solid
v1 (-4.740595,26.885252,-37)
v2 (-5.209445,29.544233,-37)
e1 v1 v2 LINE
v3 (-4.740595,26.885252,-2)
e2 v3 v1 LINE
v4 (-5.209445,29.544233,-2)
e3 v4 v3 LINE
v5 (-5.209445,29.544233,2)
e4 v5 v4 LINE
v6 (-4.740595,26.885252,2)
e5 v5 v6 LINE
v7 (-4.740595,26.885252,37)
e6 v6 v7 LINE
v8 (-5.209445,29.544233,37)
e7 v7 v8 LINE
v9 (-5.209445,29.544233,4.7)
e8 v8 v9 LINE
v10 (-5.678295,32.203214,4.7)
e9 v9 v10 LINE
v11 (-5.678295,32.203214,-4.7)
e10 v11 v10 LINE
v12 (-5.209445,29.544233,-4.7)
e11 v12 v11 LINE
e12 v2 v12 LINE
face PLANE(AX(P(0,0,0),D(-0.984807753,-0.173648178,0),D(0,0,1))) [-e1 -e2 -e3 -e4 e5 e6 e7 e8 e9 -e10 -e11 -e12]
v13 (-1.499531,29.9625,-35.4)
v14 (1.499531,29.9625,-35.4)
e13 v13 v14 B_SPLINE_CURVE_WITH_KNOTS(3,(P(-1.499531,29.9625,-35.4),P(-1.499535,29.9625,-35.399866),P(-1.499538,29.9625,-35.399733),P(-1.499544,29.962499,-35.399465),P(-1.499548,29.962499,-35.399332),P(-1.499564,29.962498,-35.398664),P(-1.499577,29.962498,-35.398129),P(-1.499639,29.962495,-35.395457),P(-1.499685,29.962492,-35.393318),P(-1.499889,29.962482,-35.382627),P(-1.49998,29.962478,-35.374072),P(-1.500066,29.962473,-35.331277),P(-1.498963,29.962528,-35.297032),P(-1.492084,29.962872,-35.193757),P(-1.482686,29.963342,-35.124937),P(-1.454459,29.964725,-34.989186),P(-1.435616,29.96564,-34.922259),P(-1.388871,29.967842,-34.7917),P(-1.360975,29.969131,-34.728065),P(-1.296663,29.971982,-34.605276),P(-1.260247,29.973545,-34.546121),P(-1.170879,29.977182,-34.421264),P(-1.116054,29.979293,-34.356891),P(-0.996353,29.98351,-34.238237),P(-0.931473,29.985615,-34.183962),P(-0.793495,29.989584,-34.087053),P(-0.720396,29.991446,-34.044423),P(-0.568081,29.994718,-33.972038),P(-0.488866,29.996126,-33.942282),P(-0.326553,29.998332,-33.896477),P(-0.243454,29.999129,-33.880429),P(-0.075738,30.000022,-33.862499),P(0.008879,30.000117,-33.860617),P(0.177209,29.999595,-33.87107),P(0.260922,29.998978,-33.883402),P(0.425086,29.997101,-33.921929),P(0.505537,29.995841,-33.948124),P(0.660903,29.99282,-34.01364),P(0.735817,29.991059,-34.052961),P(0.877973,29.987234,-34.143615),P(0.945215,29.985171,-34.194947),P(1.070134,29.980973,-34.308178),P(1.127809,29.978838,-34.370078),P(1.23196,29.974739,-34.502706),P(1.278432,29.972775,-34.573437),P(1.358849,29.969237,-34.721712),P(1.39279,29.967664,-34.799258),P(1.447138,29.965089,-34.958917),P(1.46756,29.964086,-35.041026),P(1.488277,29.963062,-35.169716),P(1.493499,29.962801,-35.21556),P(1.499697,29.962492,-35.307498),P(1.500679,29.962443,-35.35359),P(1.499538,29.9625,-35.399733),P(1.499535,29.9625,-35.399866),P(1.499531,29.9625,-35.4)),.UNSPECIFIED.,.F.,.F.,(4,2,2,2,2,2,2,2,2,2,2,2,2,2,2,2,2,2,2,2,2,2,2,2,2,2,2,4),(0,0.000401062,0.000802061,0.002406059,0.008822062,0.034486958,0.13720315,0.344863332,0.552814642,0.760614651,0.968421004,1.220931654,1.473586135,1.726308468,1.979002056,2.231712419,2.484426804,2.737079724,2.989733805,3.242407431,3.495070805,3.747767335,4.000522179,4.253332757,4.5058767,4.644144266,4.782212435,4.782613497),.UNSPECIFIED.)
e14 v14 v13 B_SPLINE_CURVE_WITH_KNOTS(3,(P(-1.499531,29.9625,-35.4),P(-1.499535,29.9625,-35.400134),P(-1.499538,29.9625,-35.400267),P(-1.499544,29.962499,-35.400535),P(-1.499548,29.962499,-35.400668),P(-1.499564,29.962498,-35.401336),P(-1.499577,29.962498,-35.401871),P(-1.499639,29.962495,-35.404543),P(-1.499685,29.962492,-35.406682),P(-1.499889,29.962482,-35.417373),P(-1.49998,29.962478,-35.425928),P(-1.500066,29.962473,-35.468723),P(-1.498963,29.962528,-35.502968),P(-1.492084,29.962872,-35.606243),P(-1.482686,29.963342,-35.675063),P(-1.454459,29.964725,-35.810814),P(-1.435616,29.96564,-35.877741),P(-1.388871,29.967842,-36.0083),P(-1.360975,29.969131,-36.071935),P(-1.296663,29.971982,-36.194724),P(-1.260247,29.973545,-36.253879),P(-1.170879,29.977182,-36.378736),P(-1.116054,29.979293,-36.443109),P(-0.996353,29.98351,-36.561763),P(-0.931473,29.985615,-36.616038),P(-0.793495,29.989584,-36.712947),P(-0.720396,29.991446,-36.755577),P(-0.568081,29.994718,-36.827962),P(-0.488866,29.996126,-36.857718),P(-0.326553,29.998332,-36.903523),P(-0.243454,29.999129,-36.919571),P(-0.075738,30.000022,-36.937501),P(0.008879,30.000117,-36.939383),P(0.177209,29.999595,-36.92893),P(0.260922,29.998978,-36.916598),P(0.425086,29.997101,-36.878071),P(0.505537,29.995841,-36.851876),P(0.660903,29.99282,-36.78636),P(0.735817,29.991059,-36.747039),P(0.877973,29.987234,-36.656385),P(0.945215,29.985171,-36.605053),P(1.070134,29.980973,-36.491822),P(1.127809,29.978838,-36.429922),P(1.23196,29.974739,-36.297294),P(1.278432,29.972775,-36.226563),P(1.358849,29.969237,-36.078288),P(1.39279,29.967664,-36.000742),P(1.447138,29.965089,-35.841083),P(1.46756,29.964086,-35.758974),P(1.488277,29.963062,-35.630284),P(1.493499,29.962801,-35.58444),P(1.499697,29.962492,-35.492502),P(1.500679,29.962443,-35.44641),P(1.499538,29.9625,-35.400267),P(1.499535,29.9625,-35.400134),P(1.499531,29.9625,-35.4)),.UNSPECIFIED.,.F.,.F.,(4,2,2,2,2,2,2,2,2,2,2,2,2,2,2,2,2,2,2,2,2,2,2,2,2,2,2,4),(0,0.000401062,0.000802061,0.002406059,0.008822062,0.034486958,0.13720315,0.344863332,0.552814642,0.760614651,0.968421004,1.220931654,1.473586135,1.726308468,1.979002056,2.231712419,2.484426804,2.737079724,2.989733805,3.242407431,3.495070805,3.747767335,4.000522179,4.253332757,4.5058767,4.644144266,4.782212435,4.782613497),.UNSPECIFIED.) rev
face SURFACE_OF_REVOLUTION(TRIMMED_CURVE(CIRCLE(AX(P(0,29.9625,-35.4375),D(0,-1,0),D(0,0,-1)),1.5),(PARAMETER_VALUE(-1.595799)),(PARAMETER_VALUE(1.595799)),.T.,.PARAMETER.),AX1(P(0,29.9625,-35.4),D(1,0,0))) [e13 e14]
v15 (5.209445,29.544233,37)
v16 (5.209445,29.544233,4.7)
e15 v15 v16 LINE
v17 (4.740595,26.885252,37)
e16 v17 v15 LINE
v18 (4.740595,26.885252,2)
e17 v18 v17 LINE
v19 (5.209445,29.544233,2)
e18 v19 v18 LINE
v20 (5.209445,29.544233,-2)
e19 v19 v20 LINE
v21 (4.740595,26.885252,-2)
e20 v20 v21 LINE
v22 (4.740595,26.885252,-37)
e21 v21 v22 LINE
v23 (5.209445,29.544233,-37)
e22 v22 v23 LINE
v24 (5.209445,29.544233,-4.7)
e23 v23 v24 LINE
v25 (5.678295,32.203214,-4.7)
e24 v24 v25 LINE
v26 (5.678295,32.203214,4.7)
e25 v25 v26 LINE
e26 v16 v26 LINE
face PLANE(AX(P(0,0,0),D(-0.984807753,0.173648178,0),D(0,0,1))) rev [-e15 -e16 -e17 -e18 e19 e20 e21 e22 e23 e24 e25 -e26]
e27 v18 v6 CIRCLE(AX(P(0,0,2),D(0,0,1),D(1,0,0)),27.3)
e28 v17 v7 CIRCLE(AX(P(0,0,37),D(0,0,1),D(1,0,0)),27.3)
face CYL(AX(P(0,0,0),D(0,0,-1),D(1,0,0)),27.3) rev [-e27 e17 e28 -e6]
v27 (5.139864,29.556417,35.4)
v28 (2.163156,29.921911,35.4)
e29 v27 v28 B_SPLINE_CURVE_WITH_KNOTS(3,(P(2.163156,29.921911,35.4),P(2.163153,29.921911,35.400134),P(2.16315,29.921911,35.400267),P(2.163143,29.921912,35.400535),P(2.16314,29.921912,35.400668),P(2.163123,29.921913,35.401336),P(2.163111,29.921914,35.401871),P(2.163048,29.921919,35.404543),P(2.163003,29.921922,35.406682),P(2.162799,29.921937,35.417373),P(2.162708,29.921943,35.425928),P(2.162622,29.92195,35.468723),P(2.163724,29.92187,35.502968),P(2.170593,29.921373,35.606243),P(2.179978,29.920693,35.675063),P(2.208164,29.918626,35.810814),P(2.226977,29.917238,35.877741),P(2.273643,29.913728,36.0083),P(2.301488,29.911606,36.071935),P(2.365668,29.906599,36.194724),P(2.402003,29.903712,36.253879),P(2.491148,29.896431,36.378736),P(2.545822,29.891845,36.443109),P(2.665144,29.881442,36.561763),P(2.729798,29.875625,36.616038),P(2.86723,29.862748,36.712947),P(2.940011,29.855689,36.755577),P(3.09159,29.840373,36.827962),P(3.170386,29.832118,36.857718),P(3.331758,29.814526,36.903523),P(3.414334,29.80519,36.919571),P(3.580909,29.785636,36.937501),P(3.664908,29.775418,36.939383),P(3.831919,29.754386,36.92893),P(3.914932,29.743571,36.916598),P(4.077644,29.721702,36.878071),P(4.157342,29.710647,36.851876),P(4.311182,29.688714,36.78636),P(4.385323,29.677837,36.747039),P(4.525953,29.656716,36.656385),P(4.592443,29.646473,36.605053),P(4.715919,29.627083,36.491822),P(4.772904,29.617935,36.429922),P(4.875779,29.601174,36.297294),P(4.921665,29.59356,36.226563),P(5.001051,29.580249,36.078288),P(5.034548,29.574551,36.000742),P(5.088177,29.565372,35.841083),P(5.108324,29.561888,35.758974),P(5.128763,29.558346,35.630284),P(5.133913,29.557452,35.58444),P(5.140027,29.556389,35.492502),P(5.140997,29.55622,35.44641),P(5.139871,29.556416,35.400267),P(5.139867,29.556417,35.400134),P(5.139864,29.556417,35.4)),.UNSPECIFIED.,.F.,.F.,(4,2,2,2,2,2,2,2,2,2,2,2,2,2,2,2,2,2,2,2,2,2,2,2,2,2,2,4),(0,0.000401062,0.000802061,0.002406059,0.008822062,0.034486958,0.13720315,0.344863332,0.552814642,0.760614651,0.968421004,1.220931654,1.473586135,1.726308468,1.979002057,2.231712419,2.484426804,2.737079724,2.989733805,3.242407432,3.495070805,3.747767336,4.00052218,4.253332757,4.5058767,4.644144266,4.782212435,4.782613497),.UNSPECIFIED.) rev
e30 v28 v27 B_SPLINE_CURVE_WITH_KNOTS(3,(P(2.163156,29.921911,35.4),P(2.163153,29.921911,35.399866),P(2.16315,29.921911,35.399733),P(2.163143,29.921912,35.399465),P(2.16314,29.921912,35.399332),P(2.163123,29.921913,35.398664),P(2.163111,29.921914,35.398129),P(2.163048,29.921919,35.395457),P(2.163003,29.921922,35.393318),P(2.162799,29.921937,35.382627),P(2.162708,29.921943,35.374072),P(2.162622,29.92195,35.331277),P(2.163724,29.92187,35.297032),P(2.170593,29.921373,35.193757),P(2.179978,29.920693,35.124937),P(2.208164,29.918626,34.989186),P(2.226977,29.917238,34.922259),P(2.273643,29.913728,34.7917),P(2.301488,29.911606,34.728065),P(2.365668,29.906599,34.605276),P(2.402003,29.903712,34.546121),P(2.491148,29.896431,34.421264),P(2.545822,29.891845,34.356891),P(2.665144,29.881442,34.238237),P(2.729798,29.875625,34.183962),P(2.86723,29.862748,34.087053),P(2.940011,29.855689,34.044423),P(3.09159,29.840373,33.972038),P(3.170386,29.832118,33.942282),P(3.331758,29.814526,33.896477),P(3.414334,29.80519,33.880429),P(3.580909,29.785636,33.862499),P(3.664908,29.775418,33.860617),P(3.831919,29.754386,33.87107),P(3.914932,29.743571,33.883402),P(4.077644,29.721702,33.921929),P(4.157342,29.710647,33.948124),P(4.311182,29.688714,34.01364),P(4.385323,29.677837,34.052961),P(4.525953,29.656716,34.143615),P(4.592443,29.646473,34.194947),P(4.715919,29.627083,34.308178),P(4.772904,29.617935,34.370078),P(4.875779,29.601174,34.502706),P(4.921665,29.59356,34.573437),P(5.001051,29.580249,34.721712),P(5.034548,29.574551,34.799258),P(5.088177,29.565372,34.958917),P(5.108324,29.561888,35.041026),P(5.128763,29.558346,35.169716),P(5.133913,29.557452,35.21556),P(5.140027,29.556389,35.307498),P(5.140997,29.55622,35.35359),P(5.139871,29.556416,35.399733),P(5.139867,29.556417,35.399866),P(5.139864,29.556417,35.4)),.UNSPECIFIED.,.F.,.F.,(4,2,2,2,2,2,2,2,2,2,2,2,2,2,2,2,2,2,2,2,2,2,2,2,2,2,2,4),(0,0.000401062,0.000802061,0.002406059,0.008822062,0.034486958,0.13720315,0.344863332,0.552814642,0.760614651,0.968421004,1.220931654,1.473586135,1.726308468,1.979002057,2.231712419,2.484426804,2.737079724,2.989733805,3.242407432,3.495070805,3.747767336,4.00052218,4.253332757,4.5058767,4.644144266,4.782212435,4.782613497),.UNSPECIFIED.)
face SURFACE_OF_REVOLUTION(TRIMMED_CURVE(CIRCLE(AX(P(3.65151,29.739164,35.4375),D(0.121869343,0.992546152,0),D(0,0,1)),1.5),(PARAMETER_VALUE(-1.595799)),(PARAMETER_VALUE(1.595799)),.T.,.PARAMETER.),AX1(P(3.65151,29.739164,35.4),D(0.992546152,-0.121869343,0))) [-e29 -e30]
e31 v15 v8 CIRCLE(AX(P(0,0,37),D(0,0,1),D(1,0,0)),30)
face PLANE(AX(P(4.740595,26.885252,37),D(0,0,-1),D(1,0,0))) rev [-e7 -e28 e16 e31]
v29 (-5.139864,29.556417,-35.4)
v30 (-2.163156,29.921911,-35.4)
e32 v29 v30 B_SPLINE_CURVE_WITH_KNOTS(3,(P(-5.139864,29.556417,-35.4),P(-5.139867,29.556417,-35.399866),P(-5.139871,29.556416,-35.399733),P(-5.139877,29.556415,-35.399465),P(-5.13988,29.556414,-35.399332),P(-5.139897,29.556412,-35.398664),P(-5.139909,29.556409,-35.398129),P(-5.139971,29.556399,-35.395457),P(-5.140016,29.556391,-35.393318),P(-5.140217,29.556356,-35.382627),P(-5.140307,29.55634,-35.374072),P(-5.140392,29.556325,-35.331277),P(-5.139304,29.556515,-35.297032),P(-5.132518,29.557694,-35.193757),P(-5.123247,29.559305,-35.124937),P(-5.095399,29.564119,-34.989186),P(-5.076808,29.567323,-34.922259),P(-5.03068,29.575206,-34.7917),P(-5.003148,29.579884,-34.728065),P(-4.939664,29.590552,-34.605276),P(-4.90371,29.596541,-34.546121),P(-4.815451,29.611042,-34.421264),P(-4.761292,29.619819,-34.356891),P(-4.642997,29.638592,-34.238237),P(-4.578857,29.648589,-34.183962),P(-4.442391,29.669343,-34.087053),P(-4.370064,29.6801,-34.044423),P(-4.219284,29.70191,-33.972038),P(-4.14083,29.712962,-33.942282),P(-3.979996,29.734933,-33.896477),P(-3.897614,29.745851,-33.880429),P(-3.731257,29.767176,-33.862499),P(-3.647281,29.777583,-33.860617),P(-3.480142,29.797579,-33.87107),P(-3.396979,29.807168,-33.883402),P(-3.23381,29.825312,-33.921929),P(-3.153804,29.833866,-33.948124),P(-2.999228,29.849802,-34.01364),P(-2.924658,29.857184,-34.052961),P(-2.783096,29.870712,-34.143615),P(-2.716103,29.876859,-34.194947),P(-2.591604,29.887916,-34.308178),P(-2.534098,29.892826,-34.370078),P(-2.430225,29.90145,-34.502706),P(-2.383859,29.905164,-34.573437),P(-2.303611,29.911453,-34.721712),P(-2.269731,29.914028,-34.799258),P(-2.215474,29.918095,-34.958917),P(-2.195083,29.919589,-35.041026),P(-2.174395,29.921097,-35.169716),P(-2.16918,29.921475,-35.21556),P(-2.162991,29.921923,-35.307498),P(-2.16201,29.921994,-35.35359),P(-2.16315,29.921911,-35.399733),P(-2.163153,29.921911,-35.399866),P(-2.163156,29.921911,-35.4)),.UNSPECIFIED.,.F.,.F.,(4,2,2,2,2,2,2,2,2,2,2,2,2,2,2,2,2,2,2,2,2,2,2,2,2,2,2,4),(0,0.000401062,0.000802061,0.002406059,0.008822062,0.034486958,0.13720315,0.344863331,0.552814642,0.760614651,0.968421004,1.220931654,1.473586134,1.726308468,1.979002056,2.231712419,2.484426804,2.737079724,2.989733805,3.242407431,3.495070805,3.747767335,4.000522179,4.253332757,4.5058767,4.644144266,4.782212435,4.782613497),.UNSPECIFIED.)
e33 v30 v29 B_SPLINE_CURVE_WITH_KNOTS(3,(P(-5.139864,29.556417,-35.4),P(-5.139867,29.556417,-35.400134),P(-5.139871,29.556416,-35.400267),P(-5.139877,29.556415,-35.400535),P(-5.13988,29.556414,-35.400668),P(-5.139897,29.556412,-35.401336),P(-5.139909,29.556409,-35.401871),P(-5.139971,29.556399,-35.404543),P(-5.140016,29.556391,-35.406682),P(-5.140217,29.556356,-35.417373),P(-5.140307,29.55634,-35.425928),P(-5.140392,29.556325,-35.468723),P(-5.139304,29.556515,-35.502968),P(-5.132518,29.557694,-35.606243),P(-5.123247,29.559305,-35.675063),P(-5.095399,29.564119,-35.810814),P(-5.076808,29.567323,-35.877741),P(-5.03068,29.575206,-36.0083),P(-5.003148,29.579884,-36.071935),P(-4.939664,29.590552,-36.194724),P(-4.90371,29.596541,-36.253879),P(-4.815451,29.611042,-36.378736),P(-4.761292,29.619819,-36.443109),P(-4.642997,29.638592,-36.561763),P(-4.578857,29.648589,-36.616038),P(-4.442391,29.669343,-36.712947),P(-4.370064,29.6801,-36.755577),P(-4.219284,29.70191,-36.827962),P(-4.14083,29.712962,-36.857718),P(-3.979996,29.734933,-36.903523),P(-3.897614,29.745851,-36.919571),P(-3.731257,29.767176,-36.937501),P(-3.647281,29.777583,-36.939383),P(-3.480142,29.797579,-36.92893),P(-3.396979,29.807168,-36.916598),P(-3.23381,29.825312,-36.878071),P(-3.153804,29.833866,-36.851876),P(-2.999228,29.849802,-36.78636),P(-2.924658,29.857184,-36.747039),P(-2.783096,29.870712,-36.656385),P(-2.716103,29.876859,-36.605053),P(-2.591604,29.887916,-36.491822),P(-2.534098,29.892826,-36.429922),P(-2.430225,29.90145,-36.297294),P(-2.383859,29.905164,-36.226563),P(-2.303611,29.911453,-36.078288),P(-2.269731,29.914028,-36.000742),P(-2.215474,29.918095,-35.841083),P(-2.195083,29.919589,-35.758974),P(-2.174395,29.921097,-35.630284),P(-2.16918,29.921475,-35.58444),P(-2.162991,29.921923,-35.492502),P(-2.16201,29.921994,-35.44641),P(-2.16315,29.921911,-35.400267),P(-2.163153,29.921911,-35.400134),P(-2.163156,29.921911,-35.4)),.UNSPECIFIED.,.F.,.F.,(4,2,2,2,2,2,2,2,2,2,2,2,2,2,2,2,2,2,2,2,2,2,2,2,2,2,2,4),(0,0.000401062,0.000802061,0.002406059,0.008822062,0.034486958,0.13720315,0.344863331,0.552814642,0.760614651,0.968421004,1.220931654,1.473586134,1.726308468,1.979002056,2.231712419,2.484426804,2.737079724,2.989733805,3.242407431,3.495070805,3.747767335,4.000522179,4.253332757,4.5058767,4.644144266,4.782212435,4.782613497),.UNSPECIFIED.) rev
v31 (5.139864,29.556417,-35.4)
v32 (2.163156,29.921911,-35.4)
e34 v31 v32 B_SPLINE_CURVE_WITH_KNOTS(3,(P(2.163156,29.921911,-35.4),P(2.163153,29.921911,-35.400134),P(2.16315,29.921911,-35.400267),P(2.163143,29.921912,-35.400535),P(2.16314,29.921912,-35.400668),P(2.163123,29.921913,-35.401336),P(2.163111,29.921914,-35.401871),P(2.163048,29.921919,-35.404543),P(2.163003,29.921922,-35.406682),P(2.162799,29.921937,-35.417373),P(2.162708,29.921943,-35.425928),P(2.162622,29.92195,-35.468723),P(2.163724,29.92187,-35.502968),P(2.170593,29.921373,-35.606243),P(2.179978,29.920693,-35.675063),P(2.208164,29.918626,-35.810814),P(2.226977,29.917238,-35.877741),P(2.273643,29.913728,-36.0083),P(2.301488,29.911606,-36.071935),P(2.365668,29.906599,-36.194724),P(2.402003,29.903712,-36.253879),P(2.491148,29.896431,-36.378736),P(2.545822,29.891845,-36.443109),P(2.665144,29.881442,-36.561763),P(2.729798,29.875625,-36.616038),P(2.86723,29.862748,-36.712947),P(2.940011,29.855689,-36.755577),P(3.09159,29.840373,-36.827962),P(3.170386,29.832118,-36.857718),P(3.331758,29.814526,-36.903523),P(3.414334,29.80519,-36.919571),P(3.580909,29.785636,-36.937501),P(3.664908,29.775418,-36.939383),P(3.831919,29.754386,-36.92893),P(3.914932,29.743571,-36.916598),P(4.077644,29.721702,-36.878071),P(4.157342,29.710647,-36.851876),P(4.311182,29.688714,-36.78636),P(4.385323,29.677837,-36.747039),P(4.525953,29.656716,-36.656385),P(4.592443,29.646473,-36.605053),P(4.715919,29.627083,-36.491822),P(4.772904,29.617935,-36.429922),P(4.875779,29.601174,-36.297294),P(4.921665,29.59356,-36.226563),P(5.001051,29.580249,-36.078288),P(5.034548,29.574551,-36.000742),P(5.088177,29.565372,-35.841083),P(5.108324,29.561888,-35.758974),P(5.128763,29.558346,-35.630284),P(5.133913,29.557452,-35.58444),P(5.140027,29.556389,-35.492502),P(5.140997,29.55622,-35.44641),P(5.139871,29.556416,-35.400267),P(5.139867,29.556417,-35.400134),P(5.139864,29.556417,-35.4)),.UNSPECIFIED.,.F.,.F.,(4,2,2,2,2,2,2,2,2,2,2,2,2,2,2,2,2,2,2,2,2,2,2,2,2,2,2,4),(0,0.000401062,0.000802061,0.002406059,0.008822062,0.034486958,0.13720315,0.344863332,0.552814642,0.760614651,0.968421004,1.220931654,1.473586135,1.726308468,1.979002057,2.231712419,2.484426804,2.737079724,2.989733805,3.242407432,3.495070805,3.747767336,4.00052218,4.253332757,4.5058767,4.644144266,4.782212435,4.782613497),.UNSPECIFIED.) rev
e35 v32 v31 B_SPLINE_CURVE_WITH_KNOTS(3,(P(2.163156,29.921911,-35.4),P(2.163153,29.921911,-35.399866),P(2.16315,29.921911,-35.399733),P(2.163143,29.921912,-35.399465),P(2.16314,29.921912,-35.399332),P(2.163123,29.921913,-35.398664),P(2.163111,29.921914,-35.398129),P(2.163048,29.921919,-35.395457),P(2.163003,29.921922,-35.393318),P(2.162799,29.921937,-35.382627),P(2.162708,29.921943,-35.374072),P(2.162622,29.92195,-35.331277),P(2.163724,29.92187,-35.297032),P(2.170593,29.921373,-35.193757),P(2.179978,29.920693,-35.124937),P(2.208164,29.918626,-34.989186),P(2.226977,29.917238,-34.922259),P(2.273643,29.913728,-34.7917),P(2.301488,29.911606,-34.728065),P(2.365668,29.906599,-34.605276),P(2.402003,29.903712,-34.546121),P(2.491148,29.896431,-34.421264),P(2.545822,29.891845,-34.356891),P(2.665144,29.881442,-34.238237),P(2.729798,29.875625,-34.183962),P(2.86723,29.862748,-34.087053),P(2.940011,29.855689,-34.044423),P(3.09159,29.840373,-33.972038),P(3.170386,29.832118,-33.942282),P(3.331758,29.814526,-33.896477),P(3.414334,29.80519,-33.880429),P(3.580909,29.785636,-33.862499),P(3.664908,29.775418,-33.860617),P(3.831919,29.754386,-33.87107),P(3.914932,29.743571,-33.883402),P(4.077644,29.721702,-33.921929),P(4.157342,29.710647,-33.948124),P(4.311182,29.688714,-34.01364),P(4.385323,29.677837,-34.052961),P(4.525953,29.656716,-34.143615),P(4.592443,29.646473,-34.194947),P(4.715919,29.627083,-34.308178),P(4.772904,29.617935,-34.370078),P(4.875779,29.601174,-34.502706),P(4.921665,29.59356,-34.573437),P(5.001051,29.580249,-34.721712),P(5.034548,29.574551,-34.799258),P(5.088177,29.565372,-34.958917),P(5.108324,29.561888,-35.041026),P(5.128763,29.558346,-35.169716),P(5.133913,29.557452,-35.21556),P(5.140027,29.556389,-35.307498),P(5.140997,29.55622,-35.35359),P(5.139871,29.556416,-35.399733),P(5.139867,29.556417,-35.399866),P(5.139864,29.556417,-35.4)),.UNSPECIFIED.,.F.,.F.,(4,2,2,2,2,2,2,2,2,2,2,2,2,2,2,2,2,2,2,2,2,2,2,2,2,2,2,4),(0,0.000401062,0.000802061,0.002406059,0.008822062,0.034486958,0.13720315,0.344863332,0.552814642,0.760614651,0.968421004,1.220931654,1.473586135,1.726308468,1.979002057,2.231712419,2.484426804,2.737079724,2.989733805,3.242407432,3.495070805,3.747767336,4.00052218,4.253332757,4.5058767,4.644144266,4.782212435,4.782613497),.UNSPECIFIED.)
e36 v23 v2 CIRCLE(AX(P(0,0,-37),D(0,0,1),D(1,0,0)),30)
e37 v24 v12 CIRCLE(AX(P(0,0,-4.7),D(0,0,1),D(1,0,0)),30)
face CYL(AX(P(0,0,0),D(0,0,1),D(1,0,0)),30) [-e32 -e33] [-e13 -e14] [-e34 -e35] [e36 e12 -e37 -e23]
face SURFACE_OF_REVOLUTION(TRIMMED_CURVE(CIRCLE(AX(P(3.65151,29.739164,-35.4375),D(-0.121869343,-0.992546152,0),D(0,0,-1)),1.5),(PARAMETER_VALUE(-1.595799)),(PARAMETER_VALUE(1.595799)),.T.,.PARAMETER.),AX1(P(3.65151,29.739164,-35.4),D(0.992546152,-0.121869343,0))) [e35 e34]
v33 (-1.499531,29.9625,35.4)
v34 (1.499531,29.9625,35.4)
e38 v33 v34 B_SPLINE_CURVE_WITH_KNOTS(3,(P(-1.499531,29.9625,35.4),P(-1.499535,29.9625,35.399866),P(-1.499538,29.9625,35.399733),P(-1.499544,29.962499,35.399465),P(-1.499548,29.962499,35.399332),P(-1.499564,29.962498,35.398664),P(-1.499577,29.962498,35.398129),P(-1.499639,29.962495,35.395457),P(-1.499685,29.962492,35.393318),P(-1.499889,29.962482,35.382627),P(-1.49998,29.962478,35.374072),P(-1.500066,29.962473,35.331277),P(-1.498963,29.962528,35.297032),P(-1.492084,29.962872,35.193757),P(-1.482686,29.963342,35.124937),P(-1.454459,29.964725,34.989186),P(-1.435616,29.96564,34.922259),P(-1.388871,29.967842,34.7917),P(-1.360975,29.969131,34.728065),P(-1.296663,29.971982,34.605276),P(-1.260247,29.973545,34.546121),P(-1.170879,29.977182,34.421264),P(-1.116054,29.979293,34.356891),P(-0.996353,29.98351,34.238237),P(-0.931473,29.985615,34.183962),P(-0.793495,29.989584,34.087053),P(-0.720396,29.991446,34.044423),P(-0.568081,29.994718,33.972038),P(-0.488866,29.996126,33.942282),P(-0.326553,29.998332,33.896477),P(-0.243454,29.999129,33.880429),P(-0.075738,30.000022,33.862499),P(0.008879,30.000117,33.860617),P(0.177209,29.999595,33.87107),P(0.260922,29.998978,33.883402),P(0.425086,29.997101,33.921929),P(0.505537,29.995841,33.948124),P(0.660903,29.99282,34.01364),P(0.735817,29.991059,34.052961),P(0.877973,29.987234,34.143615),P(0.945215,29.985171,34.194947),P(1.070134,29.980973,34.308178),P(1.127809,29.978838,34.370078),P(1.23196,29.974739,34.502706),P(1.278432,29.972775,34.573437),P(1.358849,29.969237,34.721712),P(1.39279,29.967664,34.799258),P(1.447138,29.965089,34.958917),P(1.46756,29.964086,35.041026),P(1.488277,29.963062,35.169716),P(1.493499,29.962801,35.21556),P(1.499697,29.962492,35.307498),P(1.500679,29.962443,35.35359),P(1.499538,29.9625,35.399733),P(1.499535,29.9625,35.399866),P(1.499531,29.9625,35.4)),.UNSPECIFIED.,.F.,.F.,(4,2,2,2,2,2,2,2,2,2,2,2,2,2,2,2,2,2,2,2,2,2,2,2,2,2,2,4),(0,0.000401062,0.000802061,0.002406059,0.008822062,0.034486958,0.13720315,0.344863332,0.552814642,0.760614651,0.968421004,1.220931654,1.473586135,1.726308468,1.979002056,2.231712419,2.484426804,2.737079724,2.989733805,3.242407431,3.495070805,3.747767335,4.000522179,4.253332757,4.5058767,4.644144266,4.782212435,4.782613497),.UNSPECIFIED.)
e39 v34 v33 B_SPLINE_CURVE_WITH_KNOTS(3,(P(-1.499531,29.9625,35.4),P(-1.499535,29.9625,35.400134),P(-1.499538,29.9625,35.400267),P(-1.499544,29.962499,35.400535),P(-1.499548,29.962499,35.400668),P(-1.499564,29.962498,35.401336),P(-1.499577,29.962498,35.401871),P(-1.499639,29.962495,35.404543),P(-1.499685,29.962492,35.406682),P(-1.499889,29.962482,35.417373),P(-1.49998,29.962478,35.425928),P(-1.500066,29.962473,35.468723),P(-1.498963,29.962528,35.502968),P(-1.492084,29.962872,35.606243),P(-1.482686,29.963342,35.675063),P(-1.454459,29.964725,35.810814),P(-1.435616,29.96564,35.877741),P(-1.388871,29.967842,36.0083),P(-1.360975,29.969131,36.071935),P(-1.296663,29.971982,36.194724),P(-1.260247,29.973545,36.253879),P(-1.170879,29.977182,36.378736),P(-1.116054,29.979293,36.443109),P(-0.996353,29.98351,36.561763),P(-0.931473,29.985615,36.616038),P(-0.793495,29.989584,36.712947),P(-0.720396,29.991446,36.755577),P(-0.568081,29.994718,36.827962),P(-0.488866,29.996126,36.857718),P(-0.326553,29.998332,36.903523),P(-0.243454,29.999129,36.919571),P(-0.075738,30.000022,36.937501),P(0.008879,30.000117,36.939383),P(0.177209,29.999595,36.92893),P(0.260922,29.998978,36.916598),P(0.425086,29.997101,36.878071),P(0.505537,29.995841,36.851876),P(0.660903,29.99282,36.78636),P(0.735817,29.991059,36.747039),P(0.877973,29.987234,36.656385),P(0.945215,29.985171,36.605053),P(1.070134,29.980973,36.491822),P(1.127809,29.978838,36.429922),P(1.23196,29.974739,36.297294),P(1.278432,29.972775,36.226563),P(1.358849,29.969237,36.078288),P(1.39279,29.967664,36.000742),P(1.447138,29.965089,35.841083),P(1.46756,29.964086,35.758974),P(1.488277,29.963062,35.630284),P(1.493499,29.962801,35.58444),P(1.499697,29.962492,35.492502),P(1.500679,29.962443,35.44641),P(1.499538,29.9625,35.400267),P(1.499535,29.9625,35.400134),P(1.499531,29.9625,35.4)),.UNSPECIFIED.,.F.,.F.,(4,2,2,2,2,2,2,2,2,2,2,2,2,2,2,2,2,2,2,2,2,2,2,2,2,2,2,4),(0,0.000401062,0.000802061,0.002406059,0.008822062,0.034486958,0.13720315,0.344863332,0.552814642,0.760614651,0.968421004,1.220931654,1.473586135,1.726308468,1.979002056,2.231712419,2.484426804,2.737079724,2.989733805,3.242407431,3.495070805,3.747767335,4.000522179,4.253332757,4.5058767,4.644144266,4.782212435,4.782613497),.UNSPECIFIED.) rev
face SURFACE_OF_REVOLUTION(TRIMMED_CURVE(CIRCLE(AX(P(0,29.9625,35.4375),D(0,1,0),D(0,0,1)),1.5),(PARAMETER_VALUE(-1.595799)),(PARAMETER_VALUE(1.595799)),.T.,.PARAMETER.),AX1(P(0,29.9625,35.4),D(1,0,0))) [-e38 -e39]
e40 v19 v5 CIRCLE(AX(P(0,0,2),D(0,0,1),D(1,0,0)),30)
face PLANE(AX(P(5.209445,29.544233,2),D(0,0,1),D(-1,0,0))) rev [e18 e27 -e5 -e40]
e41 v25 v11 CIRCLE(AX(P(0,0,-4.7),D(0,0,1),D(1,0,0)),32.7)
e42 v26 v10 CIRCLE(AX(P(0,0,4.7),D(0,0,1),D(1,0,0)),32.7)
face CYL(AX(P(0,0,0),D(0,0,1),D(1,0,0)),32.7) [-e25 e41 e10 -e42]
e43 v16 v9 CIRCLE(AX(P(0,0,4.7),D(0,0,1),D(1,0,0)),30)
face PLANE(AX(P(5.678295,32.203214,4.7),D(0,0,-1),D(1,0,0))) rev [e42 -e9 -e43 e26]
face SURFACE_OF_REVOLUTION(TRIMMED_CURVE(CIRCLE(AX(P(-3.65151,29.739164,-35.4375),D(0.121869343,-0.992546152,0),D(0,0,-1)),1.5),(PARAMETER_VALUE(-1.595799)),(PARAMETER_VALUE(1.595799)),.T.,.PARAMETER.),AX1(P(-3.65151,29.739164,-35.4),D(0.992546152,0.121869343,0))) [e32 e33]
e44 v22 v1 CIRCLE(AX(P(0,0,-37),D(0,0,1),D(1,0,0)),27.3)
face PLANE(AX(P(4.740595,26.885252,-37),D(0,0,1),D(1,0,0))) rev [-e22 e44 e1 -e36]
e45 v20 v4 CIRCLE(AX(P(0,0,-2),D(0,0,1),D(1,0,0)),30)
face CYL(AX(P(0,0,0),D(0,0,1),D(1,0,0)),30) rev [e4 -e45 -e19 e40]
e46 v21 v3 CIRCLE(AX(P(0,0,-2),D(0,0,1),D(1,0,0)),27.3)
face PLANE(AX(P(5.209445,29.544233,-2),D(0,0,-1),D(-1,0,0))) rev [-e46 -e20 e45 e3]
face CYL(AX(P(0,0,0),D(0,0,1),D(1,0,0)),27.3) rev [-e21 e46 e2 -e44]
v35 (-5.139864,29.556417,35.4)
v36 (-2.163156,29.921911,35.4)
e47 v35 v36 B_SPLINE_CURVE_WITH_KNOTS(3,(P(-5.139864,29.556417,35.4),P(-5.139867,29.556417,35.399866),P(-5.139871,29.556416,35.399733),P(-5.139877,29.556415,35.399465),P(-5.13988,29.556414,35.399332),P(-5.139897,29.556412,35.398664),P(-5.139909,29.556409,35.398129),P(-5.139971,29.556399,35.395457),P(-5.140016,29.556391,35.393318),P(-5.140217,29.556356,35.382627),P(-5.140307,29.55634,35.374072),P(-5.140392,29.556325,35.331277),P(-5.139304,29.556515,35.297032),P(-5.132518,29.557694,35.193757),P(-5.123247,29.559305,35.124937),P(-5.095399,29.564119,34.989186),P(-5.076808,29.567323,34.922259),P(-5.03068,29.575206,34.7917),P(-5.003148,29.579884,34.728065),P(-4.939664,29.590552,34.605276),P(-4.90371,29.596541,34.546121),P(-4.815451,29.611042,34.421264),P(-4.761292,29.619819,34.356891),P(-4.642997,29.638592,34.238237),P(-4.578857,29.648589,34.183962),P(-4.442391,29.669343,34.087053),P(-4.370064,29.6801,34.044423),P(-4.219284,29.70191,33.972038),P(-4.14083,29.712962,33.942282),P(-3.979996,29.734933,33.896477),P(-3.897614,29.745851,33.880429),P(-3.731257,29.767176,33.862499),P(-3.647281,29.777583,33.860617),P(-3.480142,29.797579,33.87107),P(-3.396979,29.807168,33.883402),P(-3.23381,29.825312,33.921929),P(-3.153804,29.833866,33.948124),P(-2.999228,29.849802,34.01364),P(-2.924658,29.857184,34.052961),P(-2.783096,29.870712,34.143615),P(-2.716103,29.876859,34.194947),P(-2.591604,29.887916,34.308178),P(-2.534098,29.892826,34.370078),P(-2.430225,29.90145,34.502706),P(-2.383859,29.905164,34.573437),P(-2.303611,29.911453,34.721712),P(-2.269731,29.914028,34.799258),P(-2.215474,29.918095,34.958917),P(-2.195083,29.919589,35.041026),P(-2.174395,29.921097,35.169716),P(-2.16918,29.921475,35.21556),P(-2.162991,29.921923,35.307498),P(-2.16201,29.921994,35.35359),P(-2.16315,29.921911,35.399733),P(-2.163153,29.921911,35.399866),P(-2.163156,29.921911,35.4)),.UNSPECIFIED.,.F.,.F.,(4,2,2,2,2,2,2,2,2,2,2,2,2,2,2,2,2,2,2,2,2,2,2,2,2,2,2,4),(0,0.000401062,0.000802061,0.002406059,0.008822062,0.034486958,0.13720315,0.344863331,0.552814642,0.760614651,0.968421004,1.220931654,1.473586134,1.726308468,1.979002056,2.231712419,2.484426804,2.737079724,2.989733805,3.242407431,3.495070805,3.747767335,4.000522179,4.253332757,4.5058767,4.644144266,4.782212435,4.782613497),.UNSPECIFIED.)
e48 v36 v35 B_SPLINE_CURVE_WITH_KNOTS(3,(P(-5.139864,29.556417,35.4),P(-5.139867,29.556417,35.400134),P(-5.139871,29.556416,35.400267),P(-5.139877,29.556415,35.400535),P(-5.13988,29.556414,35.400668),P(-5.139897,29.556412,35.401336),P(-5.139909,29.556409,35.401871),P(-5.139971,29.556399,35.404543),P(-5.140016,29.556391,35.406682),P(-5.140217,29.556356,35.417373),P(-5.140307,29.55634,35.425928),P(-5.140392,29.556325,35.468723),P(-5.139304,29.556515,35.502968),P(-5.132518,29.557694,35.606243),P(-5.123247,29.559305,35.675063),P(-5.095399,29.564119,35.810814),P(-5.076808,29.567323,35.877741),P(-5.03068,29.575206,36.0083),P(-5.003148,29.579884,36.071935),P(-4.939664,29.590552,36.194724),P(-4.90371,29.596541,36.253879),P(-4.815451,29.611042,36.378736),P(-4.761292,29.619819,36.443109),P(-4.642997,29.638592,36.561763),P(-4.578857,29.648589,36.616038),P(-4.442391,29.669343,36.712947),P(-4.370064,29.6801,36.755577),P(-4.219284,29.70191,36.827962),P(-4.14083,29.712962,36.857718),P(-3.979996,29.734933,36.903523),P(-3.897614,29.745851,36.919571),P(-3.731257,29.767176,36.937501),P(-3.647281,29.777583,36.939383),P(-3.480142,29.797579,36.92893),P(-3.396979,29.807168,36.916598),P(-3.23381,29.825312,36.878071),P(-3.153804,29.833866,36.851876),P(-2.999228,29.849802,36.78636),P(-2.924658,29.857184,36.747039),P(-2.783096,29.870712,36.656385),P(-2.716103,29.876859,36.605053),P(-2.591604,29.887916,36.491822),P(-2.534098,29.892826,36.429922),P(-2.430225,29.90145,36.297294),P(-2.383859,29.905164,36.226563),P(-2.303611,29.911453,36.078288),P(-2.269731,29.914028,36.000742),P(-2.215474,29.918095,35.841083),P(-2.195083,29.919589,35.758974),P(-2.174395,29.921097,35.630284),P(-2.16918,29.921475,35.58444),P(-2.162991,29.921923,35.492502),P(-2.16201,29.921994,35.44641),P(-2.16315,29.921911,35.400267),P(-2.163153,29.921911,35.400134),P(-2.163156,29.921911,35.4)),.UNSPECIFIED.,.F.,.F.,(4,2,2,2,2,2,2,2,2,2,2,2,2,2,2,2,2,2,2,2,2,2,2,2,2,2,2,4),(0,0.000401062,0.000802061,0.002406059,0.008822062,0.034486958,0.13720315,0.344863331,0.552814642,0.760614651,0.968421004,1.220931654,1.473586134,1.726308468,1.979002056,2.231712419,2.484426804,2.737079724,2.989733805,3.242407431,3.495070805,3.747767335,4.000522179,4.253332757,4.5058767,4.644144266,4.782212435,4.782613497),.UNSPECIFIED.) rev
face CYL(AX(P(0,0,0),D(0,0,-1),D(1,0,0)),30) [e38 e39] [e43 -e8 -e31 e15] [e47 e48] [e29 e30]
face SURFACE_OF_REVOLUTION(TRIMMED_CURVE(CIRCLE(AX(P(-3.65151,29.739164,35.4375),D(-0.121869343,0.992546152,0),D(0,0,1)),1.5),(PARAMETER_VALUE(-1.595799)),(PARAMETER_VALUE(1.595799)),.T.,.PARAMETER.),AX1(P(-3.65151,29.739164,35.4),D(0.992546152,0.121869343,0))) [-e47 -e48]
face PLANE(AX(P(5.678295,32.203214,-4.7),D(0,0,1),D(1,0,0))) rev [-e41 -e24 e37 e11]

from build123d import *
from build123d.topology import SkipClean

# Parameters (mm, degrees)
REVOLVE1_ANGLE                  = 20
CIRPATTERN1_COUNT               = 2
CIRPATTERN1_ANGLE               = 7
CIRPATTERN1_THE_OTHER_WAY_COUNT = 2
CIRPATTERN1_THE_OTHER_WAY_ANGLE = 7


with BuildPart() as part:
    # Sketch2 → Revolve1 (revolve, symmetric)
    with BuildSketch(Plane(origin=(0, 0, 0), x_dir=(0, 0, -1), z_dir=(1, 0, 0))) as revolve1_sk:
        Polygon((0, 30), (2, 30), (2, 27.3), (37, 27.3), (37, 30), (4.7, 30), (4.7, 32.7), (0, 32.7), align=None)
    revolve(axis=Axis((0, 0, 0), (0, 0, -1)), revolution_arc=REVOLVE1_ANGLE / 2)
    revolve(revolve1_sk.sketch, axis=Axis((0, 0, 0), (0, 0, 1)), revolution_arc=REVOLVE1_ANGLE / 2)

    # Sketch3 → Revolve2 (revolve)
    with SkipClean():  # the faces are left unmerged after this step: merging them gives an invalid solid
        with BuildSketch(Plane(origin=(0, 0, -35.4), x_dir=(-1, 0, 0), z_dir=(0, 0, -1))):
            with BuildLine():
                Line((-1.499531177, 29.9625), (1.499531177, 29.9625))
                ThreePointArc((1.499531177, 29.9625), (0, 31.5), (-1.499531177, 29.9625))
            make_face()
        revolve2 = revolve(axis=Axis((1.499531177, 29.9625, -35.4), (-1, 0, 0)))
    add(part.part.scale(1), mode=Mode.REPLACE)  # the faces are merged on a copy

    # CirPattern1: Revolve2 ×2 about axis
    with SkipClean():  # the faces are left unmerged after this step: merging them gives an invalid solid
        cirpattern1_axis = Axis((0, 0, 0), (0, 0, -1))
        for i in range(1, CIRPATTERN1_COUNT):
            add(revolve2.rotate(cirpattern1_axis, i * CIRPATTERN1_ANGLE / (CIRPATTERN1_COUNT - 1)))
    add(part.part.scale(1), mode=Mode.REPLACE)  # the faces are merged on a copy

    # CirPattern1 the other way: Revolve2 ×2 about axis
    with SkipClean():  # the faces are left unmerged after this step: merging them gives an invalid solid
        cirpattern1_the_other_way_axis = Axis((0, 0, 0), (0, 0, 1))
        for i in range(1, CIRPATTERN1_THE_OTHER_WAY_COUNT):
            add(revolve2.rotate(cirpattern1_the_other_way_axis, i * CIRPATTERN1_THE_OTHER_WAY_ANGLE / (CIRPATTERN1_THE_OTHER_WAY_COUNT - 1)))
    add(part.part.scale(1), mode=Mode.REPLACE)  # the faces are merged on a copy

    # Mirror2: part across plane


with BuildPart() as part_1:
    add(part.part)
    add(part.part.mirror(Plane.XY))


solid = part_1.part
